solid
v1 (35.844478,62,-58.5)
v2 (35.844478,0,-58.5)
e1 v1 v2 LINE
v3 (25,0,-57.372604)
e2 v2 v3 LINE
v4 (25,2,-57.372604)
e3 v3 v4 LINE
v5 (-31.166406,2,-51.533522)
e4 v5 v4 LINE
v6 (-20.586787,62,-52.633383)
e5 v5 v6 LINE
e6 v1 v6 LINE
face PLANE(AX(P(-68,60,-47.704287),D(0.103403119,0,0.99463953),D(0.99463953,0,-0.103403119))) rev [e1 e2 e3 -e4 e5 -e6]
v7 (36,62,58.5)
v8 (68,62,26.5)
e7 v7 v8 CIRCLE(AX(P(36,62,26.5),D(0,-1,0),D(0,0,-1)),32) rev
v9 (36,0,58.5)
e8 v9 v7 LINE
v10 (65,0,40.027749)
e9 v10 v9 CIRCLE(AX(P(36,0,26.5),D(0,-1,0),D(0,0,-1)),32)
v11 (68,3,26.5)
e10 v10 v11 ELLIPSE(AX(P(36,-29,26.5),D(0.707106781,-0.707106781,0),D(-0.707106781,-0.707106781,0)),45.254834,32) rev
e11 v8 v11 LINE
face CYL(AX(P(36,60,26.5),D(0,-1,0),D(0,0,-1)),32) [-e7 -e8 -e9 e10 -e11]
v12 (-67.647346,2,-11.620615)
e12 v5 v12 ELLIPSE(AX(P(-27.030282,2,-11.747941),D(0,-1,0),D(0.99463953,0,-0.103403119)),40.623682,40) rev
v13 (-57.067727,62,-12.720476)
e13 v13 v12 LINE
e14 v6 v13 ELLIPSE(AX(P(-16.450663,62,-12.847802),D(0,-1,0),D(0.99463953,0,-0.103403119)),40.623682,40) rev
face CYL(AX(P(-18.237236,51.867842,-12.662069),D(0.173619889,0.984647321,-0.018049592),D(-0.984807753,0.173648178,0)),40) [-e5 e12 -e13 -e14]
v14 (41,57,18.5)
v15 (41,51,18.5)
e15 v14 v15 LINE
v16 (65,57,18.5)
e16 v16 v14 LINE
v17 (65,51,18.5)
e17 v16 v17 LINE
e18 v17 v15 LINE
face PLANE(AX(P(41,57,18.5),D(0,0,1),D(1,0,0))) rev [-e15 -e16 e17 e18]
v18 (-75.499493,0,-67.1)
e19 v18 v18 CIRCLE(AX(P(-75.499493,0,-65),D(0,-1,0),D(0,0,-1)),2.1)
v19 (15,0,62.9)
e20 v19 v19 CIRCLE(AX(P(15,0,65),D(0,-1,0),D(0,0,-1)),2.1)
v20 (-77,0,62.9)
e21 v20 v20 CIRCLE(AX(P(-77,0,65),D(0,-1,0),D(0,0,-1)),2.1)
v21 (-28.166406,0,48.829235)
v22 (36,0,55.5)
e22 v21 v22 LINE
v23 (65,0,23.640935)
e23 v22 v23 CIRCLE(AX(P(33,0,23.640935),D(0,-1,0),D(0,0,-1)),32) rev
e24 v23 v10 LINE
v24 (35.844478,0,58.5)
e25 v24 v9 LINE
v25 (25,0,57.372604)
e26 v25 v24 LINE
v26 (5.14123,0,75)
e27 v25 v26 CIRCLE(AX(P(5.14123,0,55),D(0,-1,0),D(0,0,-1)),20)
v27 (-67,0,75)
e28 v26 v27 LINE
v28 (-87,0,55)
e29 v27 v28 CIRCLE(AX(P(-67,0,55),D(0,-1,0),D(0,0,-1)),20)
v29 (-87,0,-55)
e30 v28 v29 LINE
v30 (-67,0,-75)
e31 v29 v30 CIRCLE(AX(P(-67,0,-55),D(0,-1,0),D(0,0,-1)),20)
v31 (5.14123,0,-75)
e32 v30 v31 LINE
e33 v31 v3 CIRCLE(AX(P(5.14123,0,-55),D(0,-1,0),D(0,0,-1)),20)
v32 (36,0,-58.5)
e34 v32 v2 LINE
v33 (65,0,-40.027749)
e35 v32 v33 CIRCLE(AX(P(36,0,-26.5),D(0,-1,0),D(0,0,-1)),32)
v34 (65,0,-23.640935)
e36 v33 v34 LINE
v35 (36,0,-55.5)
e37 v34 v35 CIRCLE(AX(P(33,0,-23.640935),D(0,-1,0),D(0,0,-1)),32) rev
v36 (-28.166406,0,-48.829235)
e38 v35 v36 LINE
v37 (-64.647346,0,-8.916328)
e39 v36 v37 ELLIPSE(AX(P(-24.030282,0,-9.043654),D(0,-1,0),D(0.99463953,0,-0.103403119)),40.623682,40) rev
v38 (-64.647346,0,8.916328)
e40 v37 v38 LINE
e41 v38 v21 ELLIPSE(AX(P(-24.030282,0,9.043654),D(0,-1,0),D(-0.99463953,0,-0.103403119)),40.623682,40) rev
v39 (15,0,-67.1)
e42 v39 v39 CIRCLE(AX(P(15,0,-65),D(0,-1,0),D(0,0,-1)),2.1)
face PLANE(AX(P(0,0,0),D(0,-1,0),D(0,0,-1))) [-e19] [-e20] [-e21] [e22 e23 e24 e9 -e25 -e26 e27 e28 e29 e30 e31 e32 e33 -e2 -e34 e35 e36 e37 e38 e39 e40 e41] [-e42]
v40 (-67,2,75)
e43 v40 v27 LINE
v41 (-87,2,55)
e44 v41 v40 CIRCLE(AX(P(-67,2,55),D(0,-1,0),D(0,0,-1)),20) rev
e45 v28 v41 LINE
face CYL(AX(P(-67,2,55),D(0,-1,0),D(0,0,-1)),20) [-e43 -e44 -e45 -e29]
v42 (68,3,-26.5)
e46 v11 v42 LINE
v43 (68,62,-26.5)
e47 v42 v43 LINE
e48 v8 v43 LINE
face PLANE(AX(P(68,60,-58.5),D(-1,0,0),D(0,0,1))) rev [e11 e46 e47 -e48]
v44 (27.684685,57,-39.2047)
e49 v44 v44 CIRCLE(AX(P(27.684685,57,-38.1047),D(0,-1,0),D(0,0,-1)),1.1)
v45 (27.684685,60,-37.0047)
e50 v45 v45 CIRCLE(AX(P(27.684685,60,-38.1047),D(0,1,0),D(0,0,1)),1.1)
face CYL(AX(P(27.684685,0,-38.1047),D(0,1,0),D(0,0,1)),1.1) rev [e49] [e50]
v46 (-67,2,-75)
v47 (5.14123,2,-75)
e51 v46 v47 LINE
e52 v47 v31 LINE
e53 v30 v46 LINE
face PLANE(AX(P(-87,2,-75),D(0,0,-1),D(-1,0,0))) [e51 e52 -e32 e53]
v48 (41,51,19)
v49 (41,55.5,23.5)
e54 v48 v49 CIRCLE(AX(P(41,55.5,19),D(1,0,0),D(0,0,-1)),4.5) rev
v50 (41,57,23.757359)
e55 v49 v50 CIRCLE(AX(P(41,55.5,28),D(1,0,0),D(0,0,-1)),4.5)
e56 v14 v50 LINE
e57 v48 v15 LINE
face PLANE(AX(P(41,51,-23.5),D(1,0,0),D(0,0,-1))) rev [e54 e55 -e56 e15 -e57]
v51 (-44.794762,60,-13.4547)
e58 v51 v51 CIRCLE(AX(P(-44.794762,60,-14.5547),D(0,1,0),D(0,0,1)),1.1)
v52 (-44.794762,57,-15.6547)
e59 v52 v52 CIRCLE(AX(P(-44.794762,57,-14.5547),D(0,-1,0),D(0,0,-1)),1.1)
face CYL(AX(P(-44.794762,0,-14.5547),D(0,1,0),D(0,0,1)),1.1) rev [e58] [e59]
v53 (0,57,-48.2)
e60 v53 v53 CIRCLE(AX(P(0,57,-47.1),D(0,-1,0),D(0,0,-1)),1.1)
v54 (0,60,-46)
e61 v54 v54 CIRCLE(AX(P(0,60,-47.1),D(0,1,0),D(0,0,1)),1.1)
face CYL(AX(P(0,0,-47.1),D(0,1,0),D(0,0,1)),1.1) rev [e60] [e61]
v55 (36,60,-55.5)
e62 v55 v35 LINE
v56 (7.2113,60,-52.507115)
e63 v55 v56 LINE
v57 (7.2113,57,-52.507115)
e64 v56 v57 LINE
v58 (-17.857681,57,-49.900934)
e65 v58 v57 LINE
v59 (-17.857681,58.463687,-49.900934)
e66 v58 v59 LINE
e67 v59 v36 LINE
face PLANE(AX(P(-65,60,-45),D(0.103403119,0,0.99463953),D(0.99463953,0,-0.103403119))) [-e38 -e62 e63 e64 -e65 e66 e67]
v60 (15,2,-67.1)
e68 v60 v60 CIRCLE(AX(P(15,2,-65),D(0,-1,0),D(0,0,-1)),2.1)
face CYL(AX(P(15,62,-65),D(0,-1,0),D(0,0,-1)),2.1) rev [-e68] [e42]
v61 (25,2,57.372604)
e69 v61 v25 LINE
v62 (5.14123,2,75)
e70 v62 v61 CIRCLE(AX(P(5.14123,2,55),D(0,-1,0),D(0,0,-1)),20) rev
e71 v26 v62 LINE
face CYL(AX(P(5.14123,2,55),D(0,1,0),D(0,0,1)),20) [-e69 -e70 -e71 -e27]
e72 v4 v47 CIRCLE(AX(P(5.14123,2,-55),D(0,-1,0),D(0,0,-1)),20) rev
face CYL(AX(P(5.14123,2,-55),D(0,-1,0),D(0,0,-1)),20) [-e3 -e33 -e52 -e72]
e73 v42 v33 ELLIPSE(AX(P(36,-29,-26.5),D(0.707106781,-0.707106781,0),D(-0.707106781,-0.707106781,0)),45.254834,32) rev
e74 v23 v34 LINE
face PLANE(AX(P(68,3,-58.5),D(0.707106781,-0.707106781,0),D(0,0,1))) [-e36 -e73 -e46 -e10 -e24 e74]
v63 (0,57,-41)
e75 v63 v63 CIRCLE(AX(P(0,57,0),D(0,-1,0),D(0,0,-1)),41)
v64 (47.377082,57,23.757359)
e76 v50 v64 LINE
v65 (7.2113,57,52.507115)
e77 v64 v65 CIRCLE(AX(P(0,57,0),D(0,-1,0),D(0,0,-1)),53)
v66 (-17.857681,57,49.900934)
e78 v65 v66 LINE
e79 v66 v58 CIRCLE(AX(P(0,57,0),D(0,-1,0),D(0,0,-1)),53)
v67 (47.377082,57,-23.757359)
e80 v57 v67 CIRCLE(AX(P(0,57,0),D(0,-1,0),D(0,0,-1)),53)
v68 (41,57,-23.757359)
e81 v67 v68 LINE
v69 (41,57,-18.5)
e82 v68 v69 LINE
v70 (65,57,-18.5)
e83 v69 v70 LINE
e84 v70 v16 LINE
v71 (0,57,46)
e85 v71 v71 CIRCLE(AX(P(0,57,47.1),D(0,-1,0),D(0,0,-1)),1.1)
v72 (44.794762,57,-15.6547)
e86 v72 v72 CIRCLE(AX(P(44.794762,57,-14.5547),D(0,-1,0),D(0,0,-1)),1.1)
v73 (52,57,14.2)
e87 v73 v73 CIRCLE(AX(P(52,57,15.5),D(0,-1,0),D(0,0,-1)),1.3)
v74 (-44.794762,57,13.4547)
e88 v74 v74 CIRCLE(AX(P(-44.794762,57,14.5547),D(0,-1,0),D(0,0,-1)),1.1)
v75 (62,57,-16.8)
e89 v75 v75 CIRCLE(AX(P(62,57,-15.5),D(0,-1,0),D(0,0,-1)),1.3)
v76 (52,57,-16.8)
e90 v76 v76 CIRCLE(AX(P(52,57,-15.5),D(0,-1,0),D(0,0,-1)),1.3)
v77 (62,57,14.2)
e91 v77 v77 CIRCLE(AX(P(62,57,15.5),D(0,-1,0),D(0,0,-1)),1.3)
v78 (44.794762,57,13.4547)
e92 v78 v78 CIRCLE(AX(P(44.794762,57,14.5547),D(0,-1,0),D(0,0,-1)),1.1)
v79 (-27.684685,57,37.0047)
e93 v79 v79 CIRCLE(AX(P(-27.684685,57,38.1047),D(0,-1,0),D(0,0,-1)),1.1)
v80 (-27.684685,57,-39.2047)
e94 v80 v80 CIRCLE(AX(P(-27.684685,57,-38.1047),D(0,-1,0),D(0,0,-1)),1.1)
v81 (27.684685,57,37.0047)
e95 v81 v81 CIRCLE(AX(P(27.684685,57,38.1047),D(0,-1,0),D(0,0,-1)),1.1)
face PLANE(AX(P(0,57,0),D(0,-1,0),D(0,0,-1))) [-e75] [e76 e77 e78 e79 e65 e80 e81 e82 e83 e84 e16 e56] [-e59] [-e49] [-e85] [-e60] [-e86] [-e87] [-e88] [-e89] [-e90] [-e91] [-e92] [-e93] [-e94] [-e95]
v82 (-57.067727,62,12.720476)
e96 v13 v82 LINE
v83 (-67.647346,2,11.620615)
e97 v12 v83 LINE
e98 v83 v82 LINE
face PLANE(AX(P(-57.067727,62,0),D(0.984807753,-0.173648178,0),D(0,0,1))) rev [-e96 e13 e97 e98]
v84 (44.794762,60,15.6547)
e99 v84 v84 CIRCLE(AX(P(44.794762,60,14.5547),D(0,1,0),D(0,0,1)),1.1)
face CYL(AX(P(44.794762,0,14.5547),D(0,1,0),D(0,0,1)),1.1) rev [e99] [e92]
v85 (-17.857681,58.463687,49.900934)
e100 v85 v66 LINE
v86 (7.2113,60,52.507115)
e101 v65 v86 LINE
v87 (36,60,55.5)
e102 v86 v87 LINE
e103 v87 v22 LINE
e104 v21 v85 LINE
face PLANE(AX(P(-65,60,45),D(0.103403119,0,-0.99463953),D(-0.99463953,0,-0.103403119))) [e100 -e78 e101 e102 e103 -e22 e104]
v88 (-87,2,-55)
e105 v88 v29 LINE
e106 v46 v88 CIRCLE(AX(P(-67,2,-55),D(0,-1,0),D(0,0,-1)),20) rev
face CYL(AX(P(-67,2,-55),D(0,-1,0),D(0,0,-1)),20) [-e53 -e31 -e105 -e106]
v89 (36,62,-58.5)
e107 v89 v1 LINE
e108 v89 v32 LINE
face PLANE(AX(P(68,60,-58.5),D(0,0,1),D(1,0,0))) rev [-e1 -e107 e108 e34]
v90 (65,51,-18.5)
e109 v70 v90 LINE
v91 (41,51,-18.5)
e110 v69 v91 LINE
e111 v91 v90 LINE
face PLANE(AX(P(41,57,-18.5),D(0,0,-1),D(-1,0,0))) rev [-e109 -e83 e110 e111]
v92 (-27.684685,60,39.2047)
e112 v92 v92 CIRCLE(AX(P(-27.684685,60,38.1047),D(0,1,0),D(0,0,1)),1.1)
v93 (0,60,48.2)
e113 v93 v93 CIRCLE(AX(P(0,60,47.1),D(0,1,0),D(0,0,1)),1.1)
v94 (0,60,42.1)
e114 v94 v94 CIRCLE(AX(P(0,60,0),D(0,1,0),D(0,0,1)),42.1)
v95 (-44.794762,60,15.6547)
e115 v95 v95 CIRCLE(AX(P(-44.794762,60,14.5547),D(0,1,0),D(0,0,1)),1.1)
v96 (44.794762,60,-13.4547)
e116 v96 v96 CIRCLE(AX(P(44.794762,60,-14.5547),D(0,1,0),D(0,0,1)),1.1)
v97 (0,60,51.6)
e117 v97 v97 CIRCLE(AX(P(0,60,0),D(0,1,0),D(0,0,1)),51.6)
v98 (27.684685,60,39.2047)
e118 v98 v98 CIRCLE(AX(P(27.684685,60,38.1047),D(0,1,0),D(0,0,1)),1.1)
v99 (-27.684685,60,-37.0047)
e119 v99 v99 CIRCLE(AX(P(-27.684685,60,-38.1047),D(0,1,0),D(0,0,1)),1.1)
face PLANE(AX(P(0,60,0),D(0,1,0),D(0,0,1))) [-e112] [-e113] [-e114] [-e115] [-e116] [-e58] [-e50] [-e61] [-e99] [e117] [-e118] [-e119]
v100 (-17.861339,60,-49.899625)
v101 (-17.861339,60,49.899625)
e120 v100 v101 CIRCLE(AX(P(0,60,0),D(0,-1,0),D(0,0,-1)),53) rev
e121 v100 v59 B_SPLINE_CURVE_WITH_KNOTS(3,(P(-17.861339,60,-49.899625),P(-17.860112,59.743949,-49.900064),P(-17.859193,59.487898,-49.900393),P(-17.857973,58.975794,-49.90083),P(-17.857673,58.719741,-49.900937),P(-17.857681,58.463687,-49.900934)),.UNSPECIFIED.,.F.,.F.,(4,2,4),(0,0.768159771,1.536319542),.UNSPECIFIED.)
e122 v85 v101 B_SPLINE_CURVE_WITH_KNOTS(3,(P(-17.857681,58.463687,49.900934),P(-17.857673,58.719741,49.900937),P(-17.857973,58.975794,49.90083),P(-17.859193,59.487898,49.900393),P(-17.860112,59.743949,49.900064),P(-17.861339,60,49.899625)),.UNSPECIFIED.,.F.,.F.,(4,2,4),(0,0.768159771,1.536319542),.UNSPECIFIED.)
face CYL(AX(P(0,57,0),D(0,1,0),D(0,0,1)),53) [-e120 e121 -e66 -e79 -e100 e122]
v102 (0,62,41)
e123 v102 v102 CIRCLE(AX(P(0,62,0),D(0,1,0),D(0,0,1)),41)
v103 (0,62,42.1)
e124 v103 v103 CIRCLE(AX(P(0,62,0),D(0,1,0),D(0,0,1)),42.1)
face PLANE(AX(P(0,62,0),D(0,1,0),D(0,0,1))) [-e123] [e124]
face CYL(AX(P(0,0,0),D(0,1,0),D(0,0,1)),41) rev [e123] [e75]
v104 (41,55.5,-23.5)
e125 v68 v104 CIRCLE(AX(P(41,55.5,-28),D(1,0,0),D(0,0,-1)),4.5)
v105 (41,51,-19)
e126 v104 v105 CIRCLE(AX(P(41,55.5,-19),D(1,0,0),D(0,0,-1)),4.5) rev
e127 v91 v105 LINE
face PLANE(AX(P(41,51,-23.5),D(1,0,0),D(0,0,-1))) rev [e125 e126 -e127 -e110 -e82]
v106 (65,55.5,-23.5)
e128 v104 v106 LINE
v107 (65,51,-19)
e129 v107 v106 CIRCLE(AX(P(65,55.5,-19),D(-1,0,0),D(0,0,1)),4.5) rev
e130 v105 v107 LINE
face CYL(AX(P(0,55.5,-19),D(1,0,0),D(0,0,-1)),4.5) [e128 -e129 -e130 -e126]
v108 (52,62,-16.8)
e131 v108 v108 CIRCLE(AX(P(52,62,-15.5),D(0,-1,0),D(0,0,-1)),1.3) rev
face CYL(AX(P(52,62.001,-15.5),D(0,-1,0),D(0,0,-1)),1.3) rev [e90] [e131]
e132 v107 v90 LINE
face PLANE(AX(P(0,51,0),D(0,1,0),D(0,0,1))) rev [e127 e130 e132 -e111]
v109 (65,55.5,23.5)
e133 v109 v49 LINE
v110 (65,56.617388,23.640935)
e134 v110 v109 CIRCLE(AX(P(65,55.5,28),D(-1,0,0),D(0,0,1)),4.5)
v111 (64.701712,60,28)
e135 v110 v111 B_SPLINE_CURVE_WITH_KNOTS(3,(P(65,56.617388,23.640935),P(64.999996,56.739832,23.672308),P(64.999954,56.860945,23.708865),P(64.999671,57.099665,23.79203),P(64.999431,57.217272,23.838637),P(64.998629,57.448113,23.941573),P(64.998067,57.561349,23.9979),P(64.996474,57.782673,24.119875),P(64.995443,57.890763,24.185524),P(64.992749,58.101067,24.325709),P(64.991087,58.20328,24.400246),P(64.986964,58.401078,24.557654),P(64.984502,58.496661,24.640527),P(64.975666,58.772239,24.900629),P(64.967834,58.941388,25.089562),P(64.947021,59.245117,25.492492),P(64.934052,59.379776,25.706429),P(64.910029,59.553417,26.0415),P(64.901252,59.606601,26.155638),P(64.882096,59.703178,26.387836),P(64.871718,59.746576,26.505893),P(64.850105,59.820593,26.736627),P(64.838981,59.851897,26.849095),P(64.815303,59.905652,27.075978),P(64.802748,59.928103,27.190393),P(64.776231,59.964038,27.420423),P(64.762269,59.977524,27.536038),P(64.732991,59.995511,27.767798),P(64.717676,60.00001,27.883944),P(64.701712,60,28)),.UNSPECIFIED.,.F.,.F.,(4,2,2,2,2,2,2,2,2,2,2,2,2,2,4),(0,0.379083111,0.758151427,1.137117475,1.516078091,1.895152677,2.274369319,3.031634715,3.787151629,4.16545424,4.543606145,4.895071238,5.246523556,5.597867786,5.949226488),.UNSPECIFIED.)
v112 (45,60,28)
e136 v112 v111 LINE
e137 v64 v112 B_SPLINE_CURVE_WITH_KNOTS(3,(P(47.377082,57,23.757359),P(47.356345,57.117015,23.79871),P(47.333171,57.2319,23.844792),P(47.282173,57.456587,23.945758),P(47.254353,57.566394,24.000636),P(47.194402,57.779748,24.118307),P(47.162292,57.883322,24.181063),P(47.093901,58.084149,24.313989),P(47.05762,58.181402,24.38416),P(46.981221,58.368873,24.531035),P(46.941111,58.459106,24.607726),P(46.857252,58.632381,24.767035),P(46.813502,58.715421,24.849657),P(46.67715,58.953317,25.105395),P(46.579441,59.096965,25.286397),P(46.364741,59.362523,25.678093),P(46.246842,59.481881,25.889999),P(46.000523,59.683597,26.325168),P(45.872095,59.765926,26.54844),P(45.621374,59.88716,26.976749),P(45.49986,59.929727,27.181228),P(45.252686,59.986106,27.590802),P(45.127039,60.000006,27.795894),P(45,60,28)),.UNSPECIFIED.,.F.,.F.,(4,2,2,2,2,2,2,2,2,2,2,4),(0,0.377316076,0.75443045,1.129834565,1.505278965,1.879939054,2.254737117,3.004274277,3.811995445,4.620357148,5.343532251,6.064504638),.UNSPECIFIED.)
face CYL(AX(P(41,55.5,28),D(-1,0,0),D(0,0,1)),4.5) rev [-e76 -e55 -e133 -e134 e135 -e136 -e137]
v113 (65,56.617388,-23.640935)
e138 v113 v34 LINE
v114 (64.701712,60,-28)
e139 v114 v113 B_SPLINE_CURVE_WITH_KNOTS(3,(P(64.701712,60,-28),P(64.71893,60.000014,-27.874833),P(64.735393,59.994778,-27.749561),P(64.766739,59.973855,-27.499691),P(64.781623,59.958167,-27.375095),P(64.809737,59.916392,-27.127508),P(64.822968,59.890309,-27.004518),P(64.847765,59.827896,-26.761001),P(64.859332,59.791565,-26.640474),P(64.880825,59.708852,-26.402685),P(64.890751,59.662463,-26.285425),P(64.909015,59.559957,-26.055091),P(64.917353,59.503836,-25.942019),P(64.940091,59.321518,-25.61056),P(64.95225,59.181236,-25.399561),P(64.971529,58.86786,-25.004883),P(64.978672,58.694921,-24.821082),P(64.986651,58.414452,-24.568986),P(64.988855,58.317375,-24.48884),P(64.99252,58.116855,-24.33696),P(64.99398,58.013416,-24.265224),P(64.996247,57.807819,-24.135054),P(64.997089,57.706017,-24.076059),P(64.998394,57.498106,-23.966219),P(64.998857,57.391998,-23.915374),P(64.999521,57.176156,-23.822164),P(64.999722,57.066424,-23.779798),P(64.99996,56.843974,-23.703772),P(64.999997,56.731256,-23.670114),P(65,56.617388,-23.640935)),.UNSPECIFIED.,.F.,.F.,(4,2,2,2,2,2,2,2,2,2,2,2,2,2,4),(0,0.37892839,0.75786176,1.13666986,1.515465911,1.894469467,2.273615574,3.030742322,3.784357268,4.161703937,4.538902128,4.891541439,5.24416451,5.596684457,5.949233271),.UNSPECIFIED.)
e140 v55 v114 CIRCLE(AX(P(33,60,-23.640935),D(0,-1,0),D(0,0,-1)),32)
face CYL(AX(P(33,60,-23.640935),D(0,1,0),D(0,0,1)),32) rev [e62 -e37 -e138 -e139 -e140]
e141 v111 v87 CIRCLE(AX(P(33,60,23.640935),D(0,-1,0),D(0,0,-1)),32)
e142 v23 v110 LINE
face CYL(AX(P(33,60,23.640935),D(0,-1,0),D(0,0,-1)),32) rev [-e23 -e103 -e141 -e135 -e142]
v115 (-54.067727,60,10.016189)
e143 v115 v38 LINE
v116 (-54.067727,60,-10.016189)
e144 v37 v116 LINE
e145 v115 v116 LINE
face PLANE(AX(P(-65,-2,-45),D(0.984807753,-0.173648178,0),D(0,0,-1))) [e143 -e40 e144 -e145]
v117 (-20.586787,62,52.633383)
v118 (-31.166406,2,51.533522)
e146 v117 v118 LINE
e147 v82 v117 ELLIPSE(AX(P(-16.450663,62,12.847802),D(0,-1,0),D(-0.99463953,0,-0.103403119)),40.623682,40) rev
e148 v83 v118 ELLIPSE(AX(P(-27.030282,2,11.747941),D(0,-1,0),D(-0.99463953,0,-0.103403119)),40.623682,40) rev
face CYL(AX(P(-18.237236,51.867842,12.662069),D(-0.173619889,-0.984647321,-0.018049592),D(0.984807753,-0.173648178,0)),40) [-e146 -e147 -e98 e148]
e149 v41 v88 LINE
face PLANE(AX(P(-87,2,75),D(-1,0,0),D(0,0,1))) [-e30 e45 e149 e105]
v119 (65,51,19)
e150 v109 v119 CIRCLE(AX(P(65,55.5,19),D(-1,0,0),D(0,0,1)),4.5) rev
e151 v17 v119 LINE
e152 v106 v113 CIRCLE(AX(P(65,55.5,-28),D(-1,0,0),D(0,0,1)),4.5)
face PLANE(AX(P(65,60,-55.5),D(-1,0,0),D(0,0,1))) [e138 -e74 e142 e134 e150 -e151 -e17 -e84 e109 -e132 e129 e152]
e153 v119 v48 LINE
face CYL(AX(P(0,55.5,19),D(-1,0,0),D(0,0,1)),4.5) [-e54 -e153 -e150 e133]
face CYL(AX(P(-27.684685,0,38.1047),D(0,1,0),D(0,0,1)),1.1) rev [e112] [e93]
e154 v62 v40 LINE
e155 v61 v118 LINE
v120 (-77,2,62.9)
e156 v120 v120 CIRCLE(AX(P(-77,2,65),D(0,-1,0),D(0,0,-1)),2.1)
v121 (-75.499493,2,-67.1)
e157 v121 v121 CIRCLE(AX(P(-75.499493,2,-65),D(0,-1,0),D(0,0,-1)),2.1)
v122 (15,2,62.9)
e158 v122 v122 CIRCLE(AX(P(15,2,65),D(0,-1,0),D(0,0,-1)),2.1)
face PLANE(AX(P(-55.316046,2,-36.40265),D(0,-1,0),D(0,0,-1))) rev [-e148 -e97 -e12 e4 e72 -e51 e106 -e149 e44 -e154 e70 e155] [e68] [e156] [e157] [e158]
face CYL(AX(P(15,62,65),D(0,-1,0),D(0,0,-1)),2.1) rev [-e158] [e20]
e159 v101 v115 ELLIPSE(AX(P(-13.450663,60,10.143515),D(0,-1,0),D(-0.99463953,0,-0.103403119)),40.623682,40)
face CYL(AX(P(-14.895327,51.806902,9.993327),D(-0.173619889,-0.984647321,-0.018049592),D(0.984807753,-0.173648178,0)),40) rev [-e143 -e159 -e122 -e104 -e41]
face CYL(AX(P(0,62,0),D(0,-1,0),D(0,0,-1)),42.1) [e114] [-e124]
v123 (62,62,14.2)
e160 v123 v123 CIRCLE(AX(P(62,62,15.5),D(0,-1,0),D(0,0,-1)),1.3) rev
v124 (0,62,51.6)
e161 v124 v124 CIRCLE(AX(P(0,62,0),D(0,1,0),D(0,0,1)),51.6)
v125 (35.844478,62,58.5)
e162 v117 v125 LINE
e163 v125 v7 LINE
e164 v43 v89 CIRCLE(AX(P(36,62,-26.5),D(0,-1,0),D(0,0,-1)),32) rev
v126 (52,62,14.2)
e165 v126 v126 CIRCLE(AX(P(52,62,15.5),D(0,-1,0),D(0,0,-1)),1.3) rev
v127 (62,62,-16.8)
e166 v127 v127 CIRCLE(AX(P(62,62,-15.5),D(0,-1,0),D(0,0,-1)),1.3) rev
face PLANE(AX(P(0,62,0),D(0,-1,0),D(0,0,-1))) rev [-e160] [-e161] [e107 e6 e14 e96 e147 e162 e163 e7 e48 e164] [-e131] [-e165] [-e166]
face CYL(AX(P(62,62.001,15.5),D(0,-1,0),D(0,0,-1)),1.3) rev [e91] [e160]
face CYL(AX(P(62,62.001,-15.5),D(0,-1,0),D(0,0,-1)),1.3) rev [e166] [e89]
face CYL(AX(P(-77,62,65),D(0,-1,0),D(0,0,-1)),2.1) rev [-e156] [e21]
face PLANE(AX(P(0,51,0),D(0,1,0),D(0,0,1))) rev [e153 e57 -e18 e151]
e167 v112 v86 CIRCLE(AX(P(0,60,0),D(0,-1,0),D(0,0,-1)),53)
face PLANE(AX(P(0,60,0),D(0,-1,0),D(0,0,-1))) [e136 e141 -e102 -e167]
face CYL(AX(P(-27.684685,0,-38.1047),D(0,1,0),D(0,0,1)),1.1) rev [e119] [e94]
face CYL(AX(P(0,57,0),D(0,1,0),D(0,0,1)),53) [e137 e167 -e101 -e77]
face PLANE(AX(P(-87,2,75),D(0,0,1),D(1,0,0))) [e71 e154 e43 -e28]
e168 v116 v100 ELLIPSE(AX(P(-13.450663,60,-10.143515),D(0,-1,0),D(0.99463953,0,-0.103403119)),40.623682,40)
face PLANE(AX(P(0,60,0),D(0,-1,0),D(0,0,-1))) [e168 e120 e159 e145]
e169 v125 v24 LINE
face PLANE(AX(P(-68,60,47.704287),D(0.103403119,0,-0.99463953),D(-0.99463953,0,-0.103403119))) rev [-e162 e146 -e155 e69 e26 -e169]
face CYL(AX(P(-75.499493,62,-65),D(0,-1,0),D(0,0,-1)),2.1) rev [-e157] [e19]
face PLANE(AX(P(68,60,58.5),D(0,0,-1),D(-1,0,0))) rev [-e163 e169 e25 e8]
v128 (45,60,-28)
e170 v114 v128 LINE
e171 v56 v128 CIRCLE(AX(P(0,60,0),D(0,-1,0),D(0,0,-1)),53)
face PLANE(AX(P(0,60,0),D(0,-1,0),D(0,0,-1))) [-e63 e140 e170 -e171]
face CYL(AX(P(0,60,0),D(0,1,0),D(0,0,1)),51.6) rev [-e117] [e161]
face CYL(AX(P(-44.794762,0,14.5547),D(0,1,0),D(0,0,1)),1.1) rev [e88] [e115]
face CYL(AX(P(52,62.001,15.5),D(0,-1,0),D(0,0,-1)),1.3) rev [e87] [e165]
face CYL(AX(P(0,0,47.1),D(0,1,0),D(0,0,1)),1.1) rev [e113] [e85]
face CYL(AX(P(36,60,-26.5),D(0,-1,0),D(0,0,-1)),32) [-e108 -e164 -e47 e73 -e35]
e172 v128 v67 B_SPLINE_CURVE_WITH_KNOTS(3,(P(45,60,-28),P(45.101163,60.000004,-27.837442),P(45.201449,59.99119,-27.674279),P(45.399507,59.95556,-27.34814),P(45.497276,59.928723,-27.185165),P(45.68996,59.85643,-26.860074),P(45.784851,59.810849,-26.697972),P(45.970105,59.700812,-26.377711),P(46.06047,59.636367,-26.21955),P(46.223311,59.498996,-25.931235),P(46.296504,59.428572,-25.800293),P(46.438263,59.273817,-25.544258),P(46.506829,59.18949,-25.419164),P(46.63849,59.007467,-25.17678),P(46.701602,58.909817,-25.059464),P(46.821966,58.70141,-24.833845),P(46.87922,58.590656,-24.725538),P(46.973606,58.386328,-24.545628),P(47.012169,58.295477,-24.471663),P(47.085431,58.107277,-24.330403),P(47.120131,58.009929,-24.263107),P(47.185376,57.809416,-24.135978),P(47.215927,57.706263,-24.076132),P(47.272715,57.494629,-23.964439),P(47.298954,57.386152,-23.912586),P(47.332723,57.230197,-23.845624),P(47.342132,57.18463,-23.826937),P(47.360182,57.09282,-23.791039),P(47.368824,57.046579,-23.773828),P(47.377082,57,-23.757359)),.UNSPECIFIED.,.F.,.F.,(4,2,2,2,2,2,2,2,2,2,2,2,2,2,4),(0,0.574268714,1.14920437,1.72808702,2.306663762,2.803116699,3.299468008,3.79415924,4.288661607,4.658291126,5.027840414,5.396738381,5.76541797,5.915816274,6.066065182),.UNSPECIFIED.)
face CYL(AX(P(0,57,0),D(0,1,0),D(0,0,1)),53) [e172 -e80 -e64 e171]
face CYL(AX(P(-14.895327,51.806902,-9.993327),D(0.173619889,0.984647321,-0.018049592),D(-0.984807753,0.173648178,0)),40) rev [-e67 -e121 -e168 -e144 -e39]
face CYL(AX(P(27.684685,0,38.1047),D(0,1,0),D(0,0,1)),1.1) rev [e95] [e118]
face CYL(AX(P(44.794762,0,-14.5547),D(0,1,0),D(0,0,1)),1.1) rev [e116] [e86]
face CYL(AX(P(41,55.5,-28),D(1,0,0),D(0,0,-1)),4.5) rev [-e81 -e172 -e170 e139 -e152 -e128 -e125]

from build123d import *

# Parameters (mm, degrees)
EXTRUDE_1_DEPTH     = 60
EXTRUDE_2_DEPTH     = 2
SKETCH_3_R          = 53
EXTRUDE_3_DEPTH     = 3
SKETCH_4_R          = 51.6
CUT_EXTRUDE_1_DEPTH = 2
SKETCH_5_R          = 41
CUT_EXTRUDE_2_DEPTH = 108.917792787
EXTRUDE_START       = 2
SKETCH_6_R          = 42.1
SKETCH_6_R_2        = 41
EXTRUDE_4_DEPTH     = 2
SKETCH_9_W          = 24
SKETCH_9_H          = 47
EXTRUDE_6_DEPTH     = 9
SKETCH_10_W         = 24
SKETCH_10_H         = 37
CUT_EXTRUDE_6_DEPTH = 6
SKETCH_7_R          = 1.1
CUT_EXTRUDE_3_DEPTH = 108.917792787
CUT_EXTRUDE_7_REACH = 108.279
SKETCH_11_R         = 1.3
FILLET_2_R          = 4.5
CHAMFER_1_SIZE      = 62
CHAMFER_1_SIZE_2    = 10.932272804
FILLET_3_R          = 40
FILLET_4_R          = 32
CHAMFER_3_SIZE      = 3
EXTRUDE_7_DEPTH     = 2
FILLET_6_R          = 20
SKETCH_13_R         = 2.1
CUT_EXTRUDE_8_DEPTH = 131.529690109


# Some blends are built 0.0001 mm under size
with BuildPart() as part:
    # 스케치1 → 보스-돌출1 (new body)
    with BuildSketch(Plane(origin=(0, 0, 0), x_dir=(1, 0, 0), z_dir=(0, 1, 0))):
        Polygon((-68, -47.70428689), (35.844478487, -58.5), (68, -58.5), (68, 58.5), (35.844478487, 58.5), (-68, 47.70428689), align=None)
        Polygon((-65, -45), (36, -55.5), (65, -55.5), (65, 55.5), (36, 55.5), (-65, 45), align=None, mode=Mode.SUBTRACT)
    extrude(amount=EXTRUDE_1_DEPTH)

    # 스케치2 → 보스-돌출2 (add)
    with BuildSketch(Plane(origin=(0, 60, 0), x_dir=(1, 0, 0), z_dir=(0, 1, 0))):
        Polygon((-68, 47.70428689), (35.844478487, 58.5), (68, 58.5), (68, -58.5), (35.844478487, -58.5), (-68, -47.70428689), align=None)
    extrude(amount=EXTRUDE_2_DEPTH)

    # 스케치3 → 보스-돌출3 (add)
    with BuildSketch(Plane.XZ.offset(-60)):
        Circle(SKETCH_3_R)
    extrude(amount=EXTRUDE_3_DEPTH)

    # 스케치4 → 컷-돌출1 (cut)
    with BuildSketch(Plane(origin=(0, 62, 0), x_dir=(1, 0, 0), z_dir=(0, 1, 0))):
        with Locations(Location((0, 0, 0), (0, 0, 270))):
            Circle(SKETCH_4_R)
    extrude(amount=-CUT_EXTRUDE_1_DEPTH, mode=Mode.SUBTRACT)

    # 스케치5 → 컷-돌출2 (cut, through all)
    with BuildSketch(Plane(origin=(0, 60, 0), x_dir=(1, 0, 0), z_dir=(0, 1, 0))):
        with Locations(Location((0, 0, 0), (0, 0, 270))):
            Circle(SKETCH_5_R)
    extrude(amount=-CUT_EXTRUDE_2_DEPTH, mode=Mode.SUBTRACT)

    # 스케치6 → 보스-돌출4 (add)
    with BuildSketch(Plane(origin=(0, 60, 0), x_dir=(1, 0, 0), z_dir=(0, 1, 0)).offset(EXTRUDE_START)):
        with Locations(Location((0, 0, 0), (0, 0, 270))):
            Circle(SKETCH_6_R)
        with Locations(Location((0, 0, 0), (0, 0, 270))):
            Circle(SKETCH_6_R_2, mode=Mode.SUBTRACT)
    extrude(amount=-EXTRUDE_4_DEPTH)

    # 스케치9 → 보스-돌출6 (add)
    with BuildSketch(Plane.XZ.offset(-60)):
        with Locations((53, 0)):
            Rectangle(SKETCH_9_W, SKETCH_9_H)
    extrude(amount=EXTRUDE_6_DEPTH)

    # 스케치10 → 컷-돌출6 (cut)
    with BuildSketch(Plane.XZ.offset(-51)):
        with Locations((53, 0)):
            Rectangle(SKETCH_10_W, SKETCH_10_H)
    extrude(amount=-CUT_EXTRUDE_6_DEPTH, mode=Mode.SUBTRACT)

    # 스케치7 → 컷-돌출3 (cut, through all)
    with BuildSketch(Plane(origin=(0, 60, 0), x_dir=(1, 0, 0), z_dir=(0, 1, 0))):
        with Locations(Location((0, 47.1, 0), (0, 0, 270))):
            Circle(SKETCH_7_R)
        with Locations(Location((27.684685383, 38.104700435, 0), (0, 0, 270))):
            Circle(SKETCH_7_R)
        with Locations(Location((44.794761918, 14.554700435, 0), (0, 0, 270))):
            Circle(SKETCH_7_R)
        with Locations(Location((44.794761918, -14.554700435, 0), (0, 0, 270))):
            Circle(SKETCH_7_R)
        with Locations(Location((27.684685383, -38.104700435, 0), (0, 0, 270))):
            Circle(SKETCH_7_R)
        with Locations(Location((0, -47.1, 0), (0, 0, 270))):
            Circle(SKETCH_7_R)
        with Locations(Location((-27.684685383, -38.104700435, 0), (0, 0, 270))):
            Circle(SKETCH_7_R)
        with Locations(Location((-44.794761918, -14.554700435, 0), (0, 0, 270))):
            Circle(SKETCH_7_R)
        with Locations(Location((-44.794761918, 14.554700435, 0), (0, 0, 270))):
            Circle(SKETCH_7_R)
        with Locations(Location((-27.684685383, 38.104700435, 0), (0, 0, 270))):
            Circle(SKETCH_7_R)
    extrude(amount=-CUT_EXTRUDE_3_DEPTH, mode=Mode.SUBTRACT)

    # 스케치11 → 컷-돌출7 (cut, up to next)
    with BuildSketch(Plane.XZ.offset(-57), mode=Mode.PRIVATE) as cut_extrude_7_sk1:
        with Locations(Location((52, 15.5, 0), (0, 0, 270))):
            Circle(SKETCH_11_R)
    cut_extrude_7_tool1 = extrude(cut_extrude_7_sk1.sketch, amount=-CUT_EXTRUDE_7_REACH, mode=Mode.PRIVATE) & part.part
    # 스케치11 → 컷-돌출7 (cut, up to next)
    with BuildSketch(Plane.XZ.offset(-57), mode=Mode.PRIVATE) as cut_extrude_7_sk2:
        with Locations(Location((52, -15.5, 0), (0, 0, 270))):
            Circle(SKETCH_11_R)
    cut_extrude_7_tool2 = extrude(cut_extrude_7_sk2.sketch, amount=-CUT_EXTRUDE_7_REACH, mode=Mode.PRIVATE) & part.part
    # 스케치11 → 컷-돌출7 (cut, up to next)
    with BuildSketch(Plane.XZ.offset(-57), mode=Mode.PRIVATE) as cut_extrude_7_sk3:
        with Locations(Location((62, 15.5, 0), (0, 0, 270))):
            Circle(SKETCH_11_R)
    cut_extrude_7_tool3 = extrude(cut_extrude_7_sk3.sketch, amount=-CUT_EXTRUDE_7_REACH, mode=Mode.PRIVATE) & part.part
    # 스케치11 → 컷-돌출7 (cut, up to next)
    with BuildSketch(Plane.XZ.offset(-57), mode=Mode.PRIVATE) as cut_extrude_7_sk4:
        with Locations(Location((62, -15.5, 0), (0, 0, 270))):
            Circle(SKETCH_11_R)
    cut_extrude_7_tool4 = extrude(cut_extrude_7_sk4.sketch, amount=-CUT_EXTRUDE_7_REACH, mode=Mode.PRIVATE) & part.part
    add(cut_extrude_7_tool1.solids().sort_by_distance((52, 57, 15.5))[0], mode=Mode.SUBTRACT)
    add(cut_extrude_7_tool2.solids().sort_by_distance((52, 57, -15.5))[0], mode=Mode.SUBTRACT)
    add(cut_extrude_7_tool3.solids().sort_by_distance((62, 57, 15.5))[0], mode=Mode.SUBTRACT)
    add(cut_extrude_7_tool4.solids().sort_by_distance((62, 57, -15.5))[0], mode=Mode.SUBTRACT)

    # 필렛2
    fillet_2_edges = [part.edges().sort_by_distance(p)[0] for p in [
        (53, 51, 23.5),
        (53, 51, -23.5),
        (56.252631433, 60, -23.5),
        (56.252631433, 60, 23.5),
    ]]
    fillet(fillet_2_edges, radius=FILLET_2_R - 0.0001)  # a hair under: the kernel refuses the full size

    # 모따기1
    # the kernel refuses this chamfer: 62, 10.932272804 mm, written as the material it adds along each edge
    with BuildSketch(Plane(origin=(-65, 60, -206.109405378), x_dir=(0, -1, 0), z_dir=(0, 0, 1))) as chamfer_1_piece_1_section:
        Polygon((CHAMFER_1_SIZE, 0), (0, CHAMFER_1_SIZE_2), (0, 0), align=None)
    chamfer_1_piece_1 = extrude(amount=412.218810756, mode=Mode.PRIVATE)
    chamfer_1_piece_1 = split(chamfer_1_piece_1, bisect_by=Plane(origin=(-65, 0, -206.109405378), z_dir=(0, 1, 0)), keep=Keep.TOP, mode=Mode.PRIVATE)
    chamfer_1_piece_1 = split(chamfer_1_piece_1, bisect_by=Plane(origin=(-90.826308586, 60, 42.315086731), z_dir=(0.10340311946828108, 0, -0.9946395301234656)), keep=Keep.TOP, mode=Mode.PRIVATE)
    chamfer_1_piece_1 = split(chamfer_1_piece_1, bisect_by=Plane(origin=(-48.430086129, 60, -46.722614808), z_dir=(0.10340311946828099, 0, 0.9946395301234656)), keep=Keep.TOP, mode=Mode.PRIVATE)
    add(chamfer_1_piece_1)
    # the kernel refuses this chamfer: 62, 10.932272804 mm, written as the material it takes off along each edge
    with BuildSketch(Plane(origin=(-68, 62, 208.813692268), x_dir=(0, -1, 0), z_dir=(0, 0, -1))) as chamfer_1_2_piece_1:
        Polygon((CHAMFER_1_SIZE, 0), (0, -CHAMFER_1_SIZE_2), (0, 0), align=None)
    extrude(amount=417.627384536, mode=Mode.SUBTRACT)

    # 필렛3
    fillet_3_edges = [part.edges().sort_by_distance(p)[0] for p in [
        (-59.357536617, 30, 45.586592728),
        (-59.357536617, 30, -45.586592728),
        (-62.533863598, 31, -48.272548595),
        (-62.533863598, 31, 48.272548595),
    ]]
    fillet(fillet_3_edges, radius=FILLET_3_R)

    # 필렛4
    # the kernel refuses this fillet: 32 mm, written as the material it adds along each edge
    with BuildSketch(Plane(origin=(65, 0, -55.5), x_dir=(-1, 0, 0), z_dir=(0, 1, 0))) as fillet_4_piece_1_section:
        with BuildLine():
            CenterArc((32, 31.859064644), FILLET_4_R, 180, 84.620621009)
            Line((0, 31.859064644), (0, 0))
            Line((0, 0), (29, 0))
        make_face()
    fillet_4_piece_1 = extrude(amount=139.64766161, mode=Mode.PRIVATE)
    fillet_4_piece_1 = split(fillet_4_piece_1, bisect_by=Plane(origin=(65, 62, -55.5), z_dir=(0, -1, 0)), keep=Keep.TOP, mode=Mode.PRIVATE)
    add(fillet_4_piece_1)
    with BuildSketch(Plane(origin=(65, 0, 55.5), x_dir=(-1, 0, 0), z_dir=(0, 1, 0))) as fillet_4_piece_2_section:
        with BuildLine():
            CenterArc((32, -31.859064644), FILLET_4_R, 95.379378991, 84.620621009)
            Line((0, -31.859064644), (0, 0))
            Line((0, 0), (29, 0))
        make_face()
    fillet_4_piece_2 = extrude(amount=139.64766161, mode=Mode.PRIVATE)
    fillet_4_piece_2 = split(fillet_4_piece_2, bisect_by=Plane(origin=(65, 62, 55.5), z_dir=(0, -1, 0)), keep=Keep.TOP, mode=Mode.PRIVATE)
    add(fillet_4_piece_2)
    # the kernel refuses this fillet: 32 mm, written as the material it takes off along each edge
    with BuildSketch(Plane(origin=(68, -80, -58.5), x_dir=(0, 0, 1), z_dir=(0, 1, 0)), Plane(origin=(68, -80, 58.5), x_dir=(-1, 0, 0), z_dir=(0, 1, 0))) as fillet_4_2_piece_1:
        with BuildLine():
            CenterArc((FILLET_4_R, -FILLET_4_R), FILLET_4_R, 90, 90)
            Line((0, -FILLET_4_R), (0, 0))
            Line((0, 0), (FILLET_4_R, 0))
        make_face()
    extrude(amount=222, mode=Mode.SUBTRACT)

    # 모따기3
    # the kernel refuses this chamfer: 3 mm, written as the material it takes off along each edge
    with BuildSketch(Plane(origin=(68, 0, 49.645146892), x_dir=(-1, 0, 0), z_dir=(0, 0, -1))) as chamfer_3_piece_1:
        Polygon((CHAMFER_3_SIZE, 0), (0, CHAMFER_3_SIZE), (0, 0), align=None)
    extrude(amount=99.290293783, mode=Mode.SUBTRACT)

    # 스케치12 → 보스-돌출7 (add)
    with BuildSketch(Plane.XZ):
        with BuildLine():
            Line((-87, 75), (25, 75))
            Line((25, 75), (25, 54.356435644))
            Line((25, 54.356435644), (-31.208850945, 48.512941238))
            add(Edge.make_bspline(
                [(-65, 11.583952676), (-65, 13.84593004), (-64.788605397, 16.108697342), (-63.949844116, 20.560436525), (-63.322488488, 22.749328992), (-61.672367113, 26.980036242), (-60.649626077, 29.021772405), (-58.242511909, 32.889512361), (-56.858178216, 34.715440766), (-53.773914217, 38.08985885), (-52.074038344, 39.63827974), (-48.415574724, 42.405101268), (-46.457055415, 43.623443472), (-42.347190638, 45.688574053), (-40.1959253, 46.535317863), (-35.773216414, 47.828324294), (-33.501861283, 48.274558976), (-31.208850945, 48.512941238)],
                knots=[0, 0, 0, 0, 0.125, 0.125, 0.25, 0.25, 0.375, 0.375, 0.5, 0.5, 0.625, 0.625, 0.75, 0.75, 0.875, 0.875, 1, 1, 1, 1], degree=3))
            Line((-65, 11.583952676), (-65, -11.583952676))
            add(Edge.make_bspline(
                [(-31.208850945, -48.512941238), (-33.501861283, -48.274558976), (-35.773216414, -47.828324294), (-40.1959253, -46.535317863), (-42.347190638, -45.688574053), (-46.457055415, -43.623443472), (-48.415574724, -42.405101268), (-52.074038344, -39.63827974), (-53.773914217, -38.08985885), (-56.858178216, -34.715440766), (-58.242511909, -32.889512361), (-60.649626077, -29.021772405), (-61.672367113, -26.980036242), (-63.322488488, -22.749328992), (-63.949844116, -20.560436525), (-64.788605397, -16.108697342), (-65, -13.84593004), (-65, -11.583952676)],
                knots=[0, 0, 0, 0, 0.125, 0.125, 0.25, 0.25, 0.375, 0.375, 0.5, 0.5, 0.625, 0.625, 0.75, 0.75, 0.875, 0.875, 1, 1, 1, 1], degree=3))
            Line((-31.208850945, -48.512941238), (25, -54.356435644))
            Line((25, -54.356435644), (25, -75))
            Line((25, -75), (-87, -75))
            Line((-87, -75), (-87, 75))
        make_face()
    extrude(amount=-EXTRUDE_7_DEPTH)

    # 필렛6
    # the kernel refuses this fillet: 20 mm, written as the material it takes off along each edge
    with BuildSketch(Plane(origin=(25, -49.646925357, 75), x_dir=(-1, 0, 0), z_dir=(0, 1, 0))) as fillet_6_piece_1:
        with BuildLine():
            CenterArc((19.858770143, -20), FILLET_6_R, 90, 83.186946676)
            Line((0, -17.627396278), (-0.397175403, -17.579944204))
            ThreePointArc((-0.397175403, -17.579944204), (-0.4, -8.813698139), (-0.4, 0))
            Line((-0.4, 0), (0, 0.4))
            Line((0, 0.4), (19.858770143, 0.4))
            Line((19.858770143, 0.4), (19.858770143, 0))
        make_face()
    extrude(amount=101.293850713, mode=Mode.SUBTRACT)
    with BuildSketch(Plane(origin=(-87, -50, 75), x_dir=(1, 0, 0), z_dir=(0, 1, 0))) as fillet_6_piece_2:
        with BuildLine():
            CenterArc((FILLET_6_R, FILLET_6_R), FILLET_6_R, 180, 90)
            Line((0, FILLET_6_R), (-FILLET_6_R * 0.02, FILLET_6_R))
            Line((-FILLET_6_R * 0.02, FILLET_6_R), (-FILLET_6_R * 0.02, -FILLET_6_R * 0.02))
            Line((-FILLET_6_R * 0.02, -FILLET_6_R * 0.02), (FILLET_6_R, -FILLET_6_R * 0.02))
            Line((FILLET_6_R, -FILLET_6_R * 0.02), (FILLET_6_R, 0))
        make_face()
    extrude(amount=102, mode=Mode.SUBTRACT)
    with BuildSketch(Plane(origin=(25, -49.646925357, -75), x_dir=(0, 0, 1), z_dir=(0, 1, 0))) as fillet_6_piece_3:
        with BuildLine():
            CenterArc((20, -19.858770143), FILLET_6_R, 96.813053324, 83.186946676)
            Line((0, -19.858770143), (-0.4, -19.858770143))
            Line((-0.4, -19.858770143), (-0.4, 0))
            Line((-0.4, 0), (0, 0.4))
            ThreePointArc((0, 0.4), (8.813698139, 0.4), (17.579944204, 0.397175403))
            Line((17.579944204, 0.397175403), (17.627396278, 0))
        make_face()
    extrude(amount=101.293850713, mode=Mode.SUBTRACT)
    with BuildSketch(Plane(origin=(-87, -50, -75), x_dir=(1, 0, 0), z_dir=(0, 1, 0))) as fillet_6_piece_4:
        with BuildLine():
            CenterArc((FILLET_6_R, -FILLET_6_R), FILLET_6_R, 90, 90)
            Line((0, -FILLET_6_R), (-FILLET_6_R * 0.02, -FILLET_6_R))
            Line((-FILLET_6_R * 0.02, -FILLET_6_R), (-FILLET_6_R * 0.02, FILLET_6_R * 0.02))
            Line((-FILLET_6_R * 0.02, FILLET_6_R * 0.02), (FILLET_6_R, FILLET_6_R * 0.02))
            Line((FILLET_6_R, FILLET_6_R * 0.02), (FILLET_6_R, 0))
        make_face()
    extrude(amount=102, mode=Mode.SUBTRACT)

    # 스케치13 → 컷-돌출8 (cut, through all)
    with BuildSketch(Plane.XZ):
        with Locations(Location((-77, 65, 0), (0, 0, 270))):
            Circle(SKETCH_13_R)
        with Locations(Location((15, 65, 0), (0, 0, 270))):
            Circle(SKETCH_13_R)
        with Locations(Location((-75.4994928, -65, 0), (0, 0, 270))):
            Circle(SKETCH_13_R)
        with Locations(Location((15, -65, 0), (0, 0, 270))):
            Circle(SKETCH_13_R)
    extrude(amount=-CUT_EXTRUDE_8_DEPTH, mode=Mode.SUBTRACT)


solid = part.part
